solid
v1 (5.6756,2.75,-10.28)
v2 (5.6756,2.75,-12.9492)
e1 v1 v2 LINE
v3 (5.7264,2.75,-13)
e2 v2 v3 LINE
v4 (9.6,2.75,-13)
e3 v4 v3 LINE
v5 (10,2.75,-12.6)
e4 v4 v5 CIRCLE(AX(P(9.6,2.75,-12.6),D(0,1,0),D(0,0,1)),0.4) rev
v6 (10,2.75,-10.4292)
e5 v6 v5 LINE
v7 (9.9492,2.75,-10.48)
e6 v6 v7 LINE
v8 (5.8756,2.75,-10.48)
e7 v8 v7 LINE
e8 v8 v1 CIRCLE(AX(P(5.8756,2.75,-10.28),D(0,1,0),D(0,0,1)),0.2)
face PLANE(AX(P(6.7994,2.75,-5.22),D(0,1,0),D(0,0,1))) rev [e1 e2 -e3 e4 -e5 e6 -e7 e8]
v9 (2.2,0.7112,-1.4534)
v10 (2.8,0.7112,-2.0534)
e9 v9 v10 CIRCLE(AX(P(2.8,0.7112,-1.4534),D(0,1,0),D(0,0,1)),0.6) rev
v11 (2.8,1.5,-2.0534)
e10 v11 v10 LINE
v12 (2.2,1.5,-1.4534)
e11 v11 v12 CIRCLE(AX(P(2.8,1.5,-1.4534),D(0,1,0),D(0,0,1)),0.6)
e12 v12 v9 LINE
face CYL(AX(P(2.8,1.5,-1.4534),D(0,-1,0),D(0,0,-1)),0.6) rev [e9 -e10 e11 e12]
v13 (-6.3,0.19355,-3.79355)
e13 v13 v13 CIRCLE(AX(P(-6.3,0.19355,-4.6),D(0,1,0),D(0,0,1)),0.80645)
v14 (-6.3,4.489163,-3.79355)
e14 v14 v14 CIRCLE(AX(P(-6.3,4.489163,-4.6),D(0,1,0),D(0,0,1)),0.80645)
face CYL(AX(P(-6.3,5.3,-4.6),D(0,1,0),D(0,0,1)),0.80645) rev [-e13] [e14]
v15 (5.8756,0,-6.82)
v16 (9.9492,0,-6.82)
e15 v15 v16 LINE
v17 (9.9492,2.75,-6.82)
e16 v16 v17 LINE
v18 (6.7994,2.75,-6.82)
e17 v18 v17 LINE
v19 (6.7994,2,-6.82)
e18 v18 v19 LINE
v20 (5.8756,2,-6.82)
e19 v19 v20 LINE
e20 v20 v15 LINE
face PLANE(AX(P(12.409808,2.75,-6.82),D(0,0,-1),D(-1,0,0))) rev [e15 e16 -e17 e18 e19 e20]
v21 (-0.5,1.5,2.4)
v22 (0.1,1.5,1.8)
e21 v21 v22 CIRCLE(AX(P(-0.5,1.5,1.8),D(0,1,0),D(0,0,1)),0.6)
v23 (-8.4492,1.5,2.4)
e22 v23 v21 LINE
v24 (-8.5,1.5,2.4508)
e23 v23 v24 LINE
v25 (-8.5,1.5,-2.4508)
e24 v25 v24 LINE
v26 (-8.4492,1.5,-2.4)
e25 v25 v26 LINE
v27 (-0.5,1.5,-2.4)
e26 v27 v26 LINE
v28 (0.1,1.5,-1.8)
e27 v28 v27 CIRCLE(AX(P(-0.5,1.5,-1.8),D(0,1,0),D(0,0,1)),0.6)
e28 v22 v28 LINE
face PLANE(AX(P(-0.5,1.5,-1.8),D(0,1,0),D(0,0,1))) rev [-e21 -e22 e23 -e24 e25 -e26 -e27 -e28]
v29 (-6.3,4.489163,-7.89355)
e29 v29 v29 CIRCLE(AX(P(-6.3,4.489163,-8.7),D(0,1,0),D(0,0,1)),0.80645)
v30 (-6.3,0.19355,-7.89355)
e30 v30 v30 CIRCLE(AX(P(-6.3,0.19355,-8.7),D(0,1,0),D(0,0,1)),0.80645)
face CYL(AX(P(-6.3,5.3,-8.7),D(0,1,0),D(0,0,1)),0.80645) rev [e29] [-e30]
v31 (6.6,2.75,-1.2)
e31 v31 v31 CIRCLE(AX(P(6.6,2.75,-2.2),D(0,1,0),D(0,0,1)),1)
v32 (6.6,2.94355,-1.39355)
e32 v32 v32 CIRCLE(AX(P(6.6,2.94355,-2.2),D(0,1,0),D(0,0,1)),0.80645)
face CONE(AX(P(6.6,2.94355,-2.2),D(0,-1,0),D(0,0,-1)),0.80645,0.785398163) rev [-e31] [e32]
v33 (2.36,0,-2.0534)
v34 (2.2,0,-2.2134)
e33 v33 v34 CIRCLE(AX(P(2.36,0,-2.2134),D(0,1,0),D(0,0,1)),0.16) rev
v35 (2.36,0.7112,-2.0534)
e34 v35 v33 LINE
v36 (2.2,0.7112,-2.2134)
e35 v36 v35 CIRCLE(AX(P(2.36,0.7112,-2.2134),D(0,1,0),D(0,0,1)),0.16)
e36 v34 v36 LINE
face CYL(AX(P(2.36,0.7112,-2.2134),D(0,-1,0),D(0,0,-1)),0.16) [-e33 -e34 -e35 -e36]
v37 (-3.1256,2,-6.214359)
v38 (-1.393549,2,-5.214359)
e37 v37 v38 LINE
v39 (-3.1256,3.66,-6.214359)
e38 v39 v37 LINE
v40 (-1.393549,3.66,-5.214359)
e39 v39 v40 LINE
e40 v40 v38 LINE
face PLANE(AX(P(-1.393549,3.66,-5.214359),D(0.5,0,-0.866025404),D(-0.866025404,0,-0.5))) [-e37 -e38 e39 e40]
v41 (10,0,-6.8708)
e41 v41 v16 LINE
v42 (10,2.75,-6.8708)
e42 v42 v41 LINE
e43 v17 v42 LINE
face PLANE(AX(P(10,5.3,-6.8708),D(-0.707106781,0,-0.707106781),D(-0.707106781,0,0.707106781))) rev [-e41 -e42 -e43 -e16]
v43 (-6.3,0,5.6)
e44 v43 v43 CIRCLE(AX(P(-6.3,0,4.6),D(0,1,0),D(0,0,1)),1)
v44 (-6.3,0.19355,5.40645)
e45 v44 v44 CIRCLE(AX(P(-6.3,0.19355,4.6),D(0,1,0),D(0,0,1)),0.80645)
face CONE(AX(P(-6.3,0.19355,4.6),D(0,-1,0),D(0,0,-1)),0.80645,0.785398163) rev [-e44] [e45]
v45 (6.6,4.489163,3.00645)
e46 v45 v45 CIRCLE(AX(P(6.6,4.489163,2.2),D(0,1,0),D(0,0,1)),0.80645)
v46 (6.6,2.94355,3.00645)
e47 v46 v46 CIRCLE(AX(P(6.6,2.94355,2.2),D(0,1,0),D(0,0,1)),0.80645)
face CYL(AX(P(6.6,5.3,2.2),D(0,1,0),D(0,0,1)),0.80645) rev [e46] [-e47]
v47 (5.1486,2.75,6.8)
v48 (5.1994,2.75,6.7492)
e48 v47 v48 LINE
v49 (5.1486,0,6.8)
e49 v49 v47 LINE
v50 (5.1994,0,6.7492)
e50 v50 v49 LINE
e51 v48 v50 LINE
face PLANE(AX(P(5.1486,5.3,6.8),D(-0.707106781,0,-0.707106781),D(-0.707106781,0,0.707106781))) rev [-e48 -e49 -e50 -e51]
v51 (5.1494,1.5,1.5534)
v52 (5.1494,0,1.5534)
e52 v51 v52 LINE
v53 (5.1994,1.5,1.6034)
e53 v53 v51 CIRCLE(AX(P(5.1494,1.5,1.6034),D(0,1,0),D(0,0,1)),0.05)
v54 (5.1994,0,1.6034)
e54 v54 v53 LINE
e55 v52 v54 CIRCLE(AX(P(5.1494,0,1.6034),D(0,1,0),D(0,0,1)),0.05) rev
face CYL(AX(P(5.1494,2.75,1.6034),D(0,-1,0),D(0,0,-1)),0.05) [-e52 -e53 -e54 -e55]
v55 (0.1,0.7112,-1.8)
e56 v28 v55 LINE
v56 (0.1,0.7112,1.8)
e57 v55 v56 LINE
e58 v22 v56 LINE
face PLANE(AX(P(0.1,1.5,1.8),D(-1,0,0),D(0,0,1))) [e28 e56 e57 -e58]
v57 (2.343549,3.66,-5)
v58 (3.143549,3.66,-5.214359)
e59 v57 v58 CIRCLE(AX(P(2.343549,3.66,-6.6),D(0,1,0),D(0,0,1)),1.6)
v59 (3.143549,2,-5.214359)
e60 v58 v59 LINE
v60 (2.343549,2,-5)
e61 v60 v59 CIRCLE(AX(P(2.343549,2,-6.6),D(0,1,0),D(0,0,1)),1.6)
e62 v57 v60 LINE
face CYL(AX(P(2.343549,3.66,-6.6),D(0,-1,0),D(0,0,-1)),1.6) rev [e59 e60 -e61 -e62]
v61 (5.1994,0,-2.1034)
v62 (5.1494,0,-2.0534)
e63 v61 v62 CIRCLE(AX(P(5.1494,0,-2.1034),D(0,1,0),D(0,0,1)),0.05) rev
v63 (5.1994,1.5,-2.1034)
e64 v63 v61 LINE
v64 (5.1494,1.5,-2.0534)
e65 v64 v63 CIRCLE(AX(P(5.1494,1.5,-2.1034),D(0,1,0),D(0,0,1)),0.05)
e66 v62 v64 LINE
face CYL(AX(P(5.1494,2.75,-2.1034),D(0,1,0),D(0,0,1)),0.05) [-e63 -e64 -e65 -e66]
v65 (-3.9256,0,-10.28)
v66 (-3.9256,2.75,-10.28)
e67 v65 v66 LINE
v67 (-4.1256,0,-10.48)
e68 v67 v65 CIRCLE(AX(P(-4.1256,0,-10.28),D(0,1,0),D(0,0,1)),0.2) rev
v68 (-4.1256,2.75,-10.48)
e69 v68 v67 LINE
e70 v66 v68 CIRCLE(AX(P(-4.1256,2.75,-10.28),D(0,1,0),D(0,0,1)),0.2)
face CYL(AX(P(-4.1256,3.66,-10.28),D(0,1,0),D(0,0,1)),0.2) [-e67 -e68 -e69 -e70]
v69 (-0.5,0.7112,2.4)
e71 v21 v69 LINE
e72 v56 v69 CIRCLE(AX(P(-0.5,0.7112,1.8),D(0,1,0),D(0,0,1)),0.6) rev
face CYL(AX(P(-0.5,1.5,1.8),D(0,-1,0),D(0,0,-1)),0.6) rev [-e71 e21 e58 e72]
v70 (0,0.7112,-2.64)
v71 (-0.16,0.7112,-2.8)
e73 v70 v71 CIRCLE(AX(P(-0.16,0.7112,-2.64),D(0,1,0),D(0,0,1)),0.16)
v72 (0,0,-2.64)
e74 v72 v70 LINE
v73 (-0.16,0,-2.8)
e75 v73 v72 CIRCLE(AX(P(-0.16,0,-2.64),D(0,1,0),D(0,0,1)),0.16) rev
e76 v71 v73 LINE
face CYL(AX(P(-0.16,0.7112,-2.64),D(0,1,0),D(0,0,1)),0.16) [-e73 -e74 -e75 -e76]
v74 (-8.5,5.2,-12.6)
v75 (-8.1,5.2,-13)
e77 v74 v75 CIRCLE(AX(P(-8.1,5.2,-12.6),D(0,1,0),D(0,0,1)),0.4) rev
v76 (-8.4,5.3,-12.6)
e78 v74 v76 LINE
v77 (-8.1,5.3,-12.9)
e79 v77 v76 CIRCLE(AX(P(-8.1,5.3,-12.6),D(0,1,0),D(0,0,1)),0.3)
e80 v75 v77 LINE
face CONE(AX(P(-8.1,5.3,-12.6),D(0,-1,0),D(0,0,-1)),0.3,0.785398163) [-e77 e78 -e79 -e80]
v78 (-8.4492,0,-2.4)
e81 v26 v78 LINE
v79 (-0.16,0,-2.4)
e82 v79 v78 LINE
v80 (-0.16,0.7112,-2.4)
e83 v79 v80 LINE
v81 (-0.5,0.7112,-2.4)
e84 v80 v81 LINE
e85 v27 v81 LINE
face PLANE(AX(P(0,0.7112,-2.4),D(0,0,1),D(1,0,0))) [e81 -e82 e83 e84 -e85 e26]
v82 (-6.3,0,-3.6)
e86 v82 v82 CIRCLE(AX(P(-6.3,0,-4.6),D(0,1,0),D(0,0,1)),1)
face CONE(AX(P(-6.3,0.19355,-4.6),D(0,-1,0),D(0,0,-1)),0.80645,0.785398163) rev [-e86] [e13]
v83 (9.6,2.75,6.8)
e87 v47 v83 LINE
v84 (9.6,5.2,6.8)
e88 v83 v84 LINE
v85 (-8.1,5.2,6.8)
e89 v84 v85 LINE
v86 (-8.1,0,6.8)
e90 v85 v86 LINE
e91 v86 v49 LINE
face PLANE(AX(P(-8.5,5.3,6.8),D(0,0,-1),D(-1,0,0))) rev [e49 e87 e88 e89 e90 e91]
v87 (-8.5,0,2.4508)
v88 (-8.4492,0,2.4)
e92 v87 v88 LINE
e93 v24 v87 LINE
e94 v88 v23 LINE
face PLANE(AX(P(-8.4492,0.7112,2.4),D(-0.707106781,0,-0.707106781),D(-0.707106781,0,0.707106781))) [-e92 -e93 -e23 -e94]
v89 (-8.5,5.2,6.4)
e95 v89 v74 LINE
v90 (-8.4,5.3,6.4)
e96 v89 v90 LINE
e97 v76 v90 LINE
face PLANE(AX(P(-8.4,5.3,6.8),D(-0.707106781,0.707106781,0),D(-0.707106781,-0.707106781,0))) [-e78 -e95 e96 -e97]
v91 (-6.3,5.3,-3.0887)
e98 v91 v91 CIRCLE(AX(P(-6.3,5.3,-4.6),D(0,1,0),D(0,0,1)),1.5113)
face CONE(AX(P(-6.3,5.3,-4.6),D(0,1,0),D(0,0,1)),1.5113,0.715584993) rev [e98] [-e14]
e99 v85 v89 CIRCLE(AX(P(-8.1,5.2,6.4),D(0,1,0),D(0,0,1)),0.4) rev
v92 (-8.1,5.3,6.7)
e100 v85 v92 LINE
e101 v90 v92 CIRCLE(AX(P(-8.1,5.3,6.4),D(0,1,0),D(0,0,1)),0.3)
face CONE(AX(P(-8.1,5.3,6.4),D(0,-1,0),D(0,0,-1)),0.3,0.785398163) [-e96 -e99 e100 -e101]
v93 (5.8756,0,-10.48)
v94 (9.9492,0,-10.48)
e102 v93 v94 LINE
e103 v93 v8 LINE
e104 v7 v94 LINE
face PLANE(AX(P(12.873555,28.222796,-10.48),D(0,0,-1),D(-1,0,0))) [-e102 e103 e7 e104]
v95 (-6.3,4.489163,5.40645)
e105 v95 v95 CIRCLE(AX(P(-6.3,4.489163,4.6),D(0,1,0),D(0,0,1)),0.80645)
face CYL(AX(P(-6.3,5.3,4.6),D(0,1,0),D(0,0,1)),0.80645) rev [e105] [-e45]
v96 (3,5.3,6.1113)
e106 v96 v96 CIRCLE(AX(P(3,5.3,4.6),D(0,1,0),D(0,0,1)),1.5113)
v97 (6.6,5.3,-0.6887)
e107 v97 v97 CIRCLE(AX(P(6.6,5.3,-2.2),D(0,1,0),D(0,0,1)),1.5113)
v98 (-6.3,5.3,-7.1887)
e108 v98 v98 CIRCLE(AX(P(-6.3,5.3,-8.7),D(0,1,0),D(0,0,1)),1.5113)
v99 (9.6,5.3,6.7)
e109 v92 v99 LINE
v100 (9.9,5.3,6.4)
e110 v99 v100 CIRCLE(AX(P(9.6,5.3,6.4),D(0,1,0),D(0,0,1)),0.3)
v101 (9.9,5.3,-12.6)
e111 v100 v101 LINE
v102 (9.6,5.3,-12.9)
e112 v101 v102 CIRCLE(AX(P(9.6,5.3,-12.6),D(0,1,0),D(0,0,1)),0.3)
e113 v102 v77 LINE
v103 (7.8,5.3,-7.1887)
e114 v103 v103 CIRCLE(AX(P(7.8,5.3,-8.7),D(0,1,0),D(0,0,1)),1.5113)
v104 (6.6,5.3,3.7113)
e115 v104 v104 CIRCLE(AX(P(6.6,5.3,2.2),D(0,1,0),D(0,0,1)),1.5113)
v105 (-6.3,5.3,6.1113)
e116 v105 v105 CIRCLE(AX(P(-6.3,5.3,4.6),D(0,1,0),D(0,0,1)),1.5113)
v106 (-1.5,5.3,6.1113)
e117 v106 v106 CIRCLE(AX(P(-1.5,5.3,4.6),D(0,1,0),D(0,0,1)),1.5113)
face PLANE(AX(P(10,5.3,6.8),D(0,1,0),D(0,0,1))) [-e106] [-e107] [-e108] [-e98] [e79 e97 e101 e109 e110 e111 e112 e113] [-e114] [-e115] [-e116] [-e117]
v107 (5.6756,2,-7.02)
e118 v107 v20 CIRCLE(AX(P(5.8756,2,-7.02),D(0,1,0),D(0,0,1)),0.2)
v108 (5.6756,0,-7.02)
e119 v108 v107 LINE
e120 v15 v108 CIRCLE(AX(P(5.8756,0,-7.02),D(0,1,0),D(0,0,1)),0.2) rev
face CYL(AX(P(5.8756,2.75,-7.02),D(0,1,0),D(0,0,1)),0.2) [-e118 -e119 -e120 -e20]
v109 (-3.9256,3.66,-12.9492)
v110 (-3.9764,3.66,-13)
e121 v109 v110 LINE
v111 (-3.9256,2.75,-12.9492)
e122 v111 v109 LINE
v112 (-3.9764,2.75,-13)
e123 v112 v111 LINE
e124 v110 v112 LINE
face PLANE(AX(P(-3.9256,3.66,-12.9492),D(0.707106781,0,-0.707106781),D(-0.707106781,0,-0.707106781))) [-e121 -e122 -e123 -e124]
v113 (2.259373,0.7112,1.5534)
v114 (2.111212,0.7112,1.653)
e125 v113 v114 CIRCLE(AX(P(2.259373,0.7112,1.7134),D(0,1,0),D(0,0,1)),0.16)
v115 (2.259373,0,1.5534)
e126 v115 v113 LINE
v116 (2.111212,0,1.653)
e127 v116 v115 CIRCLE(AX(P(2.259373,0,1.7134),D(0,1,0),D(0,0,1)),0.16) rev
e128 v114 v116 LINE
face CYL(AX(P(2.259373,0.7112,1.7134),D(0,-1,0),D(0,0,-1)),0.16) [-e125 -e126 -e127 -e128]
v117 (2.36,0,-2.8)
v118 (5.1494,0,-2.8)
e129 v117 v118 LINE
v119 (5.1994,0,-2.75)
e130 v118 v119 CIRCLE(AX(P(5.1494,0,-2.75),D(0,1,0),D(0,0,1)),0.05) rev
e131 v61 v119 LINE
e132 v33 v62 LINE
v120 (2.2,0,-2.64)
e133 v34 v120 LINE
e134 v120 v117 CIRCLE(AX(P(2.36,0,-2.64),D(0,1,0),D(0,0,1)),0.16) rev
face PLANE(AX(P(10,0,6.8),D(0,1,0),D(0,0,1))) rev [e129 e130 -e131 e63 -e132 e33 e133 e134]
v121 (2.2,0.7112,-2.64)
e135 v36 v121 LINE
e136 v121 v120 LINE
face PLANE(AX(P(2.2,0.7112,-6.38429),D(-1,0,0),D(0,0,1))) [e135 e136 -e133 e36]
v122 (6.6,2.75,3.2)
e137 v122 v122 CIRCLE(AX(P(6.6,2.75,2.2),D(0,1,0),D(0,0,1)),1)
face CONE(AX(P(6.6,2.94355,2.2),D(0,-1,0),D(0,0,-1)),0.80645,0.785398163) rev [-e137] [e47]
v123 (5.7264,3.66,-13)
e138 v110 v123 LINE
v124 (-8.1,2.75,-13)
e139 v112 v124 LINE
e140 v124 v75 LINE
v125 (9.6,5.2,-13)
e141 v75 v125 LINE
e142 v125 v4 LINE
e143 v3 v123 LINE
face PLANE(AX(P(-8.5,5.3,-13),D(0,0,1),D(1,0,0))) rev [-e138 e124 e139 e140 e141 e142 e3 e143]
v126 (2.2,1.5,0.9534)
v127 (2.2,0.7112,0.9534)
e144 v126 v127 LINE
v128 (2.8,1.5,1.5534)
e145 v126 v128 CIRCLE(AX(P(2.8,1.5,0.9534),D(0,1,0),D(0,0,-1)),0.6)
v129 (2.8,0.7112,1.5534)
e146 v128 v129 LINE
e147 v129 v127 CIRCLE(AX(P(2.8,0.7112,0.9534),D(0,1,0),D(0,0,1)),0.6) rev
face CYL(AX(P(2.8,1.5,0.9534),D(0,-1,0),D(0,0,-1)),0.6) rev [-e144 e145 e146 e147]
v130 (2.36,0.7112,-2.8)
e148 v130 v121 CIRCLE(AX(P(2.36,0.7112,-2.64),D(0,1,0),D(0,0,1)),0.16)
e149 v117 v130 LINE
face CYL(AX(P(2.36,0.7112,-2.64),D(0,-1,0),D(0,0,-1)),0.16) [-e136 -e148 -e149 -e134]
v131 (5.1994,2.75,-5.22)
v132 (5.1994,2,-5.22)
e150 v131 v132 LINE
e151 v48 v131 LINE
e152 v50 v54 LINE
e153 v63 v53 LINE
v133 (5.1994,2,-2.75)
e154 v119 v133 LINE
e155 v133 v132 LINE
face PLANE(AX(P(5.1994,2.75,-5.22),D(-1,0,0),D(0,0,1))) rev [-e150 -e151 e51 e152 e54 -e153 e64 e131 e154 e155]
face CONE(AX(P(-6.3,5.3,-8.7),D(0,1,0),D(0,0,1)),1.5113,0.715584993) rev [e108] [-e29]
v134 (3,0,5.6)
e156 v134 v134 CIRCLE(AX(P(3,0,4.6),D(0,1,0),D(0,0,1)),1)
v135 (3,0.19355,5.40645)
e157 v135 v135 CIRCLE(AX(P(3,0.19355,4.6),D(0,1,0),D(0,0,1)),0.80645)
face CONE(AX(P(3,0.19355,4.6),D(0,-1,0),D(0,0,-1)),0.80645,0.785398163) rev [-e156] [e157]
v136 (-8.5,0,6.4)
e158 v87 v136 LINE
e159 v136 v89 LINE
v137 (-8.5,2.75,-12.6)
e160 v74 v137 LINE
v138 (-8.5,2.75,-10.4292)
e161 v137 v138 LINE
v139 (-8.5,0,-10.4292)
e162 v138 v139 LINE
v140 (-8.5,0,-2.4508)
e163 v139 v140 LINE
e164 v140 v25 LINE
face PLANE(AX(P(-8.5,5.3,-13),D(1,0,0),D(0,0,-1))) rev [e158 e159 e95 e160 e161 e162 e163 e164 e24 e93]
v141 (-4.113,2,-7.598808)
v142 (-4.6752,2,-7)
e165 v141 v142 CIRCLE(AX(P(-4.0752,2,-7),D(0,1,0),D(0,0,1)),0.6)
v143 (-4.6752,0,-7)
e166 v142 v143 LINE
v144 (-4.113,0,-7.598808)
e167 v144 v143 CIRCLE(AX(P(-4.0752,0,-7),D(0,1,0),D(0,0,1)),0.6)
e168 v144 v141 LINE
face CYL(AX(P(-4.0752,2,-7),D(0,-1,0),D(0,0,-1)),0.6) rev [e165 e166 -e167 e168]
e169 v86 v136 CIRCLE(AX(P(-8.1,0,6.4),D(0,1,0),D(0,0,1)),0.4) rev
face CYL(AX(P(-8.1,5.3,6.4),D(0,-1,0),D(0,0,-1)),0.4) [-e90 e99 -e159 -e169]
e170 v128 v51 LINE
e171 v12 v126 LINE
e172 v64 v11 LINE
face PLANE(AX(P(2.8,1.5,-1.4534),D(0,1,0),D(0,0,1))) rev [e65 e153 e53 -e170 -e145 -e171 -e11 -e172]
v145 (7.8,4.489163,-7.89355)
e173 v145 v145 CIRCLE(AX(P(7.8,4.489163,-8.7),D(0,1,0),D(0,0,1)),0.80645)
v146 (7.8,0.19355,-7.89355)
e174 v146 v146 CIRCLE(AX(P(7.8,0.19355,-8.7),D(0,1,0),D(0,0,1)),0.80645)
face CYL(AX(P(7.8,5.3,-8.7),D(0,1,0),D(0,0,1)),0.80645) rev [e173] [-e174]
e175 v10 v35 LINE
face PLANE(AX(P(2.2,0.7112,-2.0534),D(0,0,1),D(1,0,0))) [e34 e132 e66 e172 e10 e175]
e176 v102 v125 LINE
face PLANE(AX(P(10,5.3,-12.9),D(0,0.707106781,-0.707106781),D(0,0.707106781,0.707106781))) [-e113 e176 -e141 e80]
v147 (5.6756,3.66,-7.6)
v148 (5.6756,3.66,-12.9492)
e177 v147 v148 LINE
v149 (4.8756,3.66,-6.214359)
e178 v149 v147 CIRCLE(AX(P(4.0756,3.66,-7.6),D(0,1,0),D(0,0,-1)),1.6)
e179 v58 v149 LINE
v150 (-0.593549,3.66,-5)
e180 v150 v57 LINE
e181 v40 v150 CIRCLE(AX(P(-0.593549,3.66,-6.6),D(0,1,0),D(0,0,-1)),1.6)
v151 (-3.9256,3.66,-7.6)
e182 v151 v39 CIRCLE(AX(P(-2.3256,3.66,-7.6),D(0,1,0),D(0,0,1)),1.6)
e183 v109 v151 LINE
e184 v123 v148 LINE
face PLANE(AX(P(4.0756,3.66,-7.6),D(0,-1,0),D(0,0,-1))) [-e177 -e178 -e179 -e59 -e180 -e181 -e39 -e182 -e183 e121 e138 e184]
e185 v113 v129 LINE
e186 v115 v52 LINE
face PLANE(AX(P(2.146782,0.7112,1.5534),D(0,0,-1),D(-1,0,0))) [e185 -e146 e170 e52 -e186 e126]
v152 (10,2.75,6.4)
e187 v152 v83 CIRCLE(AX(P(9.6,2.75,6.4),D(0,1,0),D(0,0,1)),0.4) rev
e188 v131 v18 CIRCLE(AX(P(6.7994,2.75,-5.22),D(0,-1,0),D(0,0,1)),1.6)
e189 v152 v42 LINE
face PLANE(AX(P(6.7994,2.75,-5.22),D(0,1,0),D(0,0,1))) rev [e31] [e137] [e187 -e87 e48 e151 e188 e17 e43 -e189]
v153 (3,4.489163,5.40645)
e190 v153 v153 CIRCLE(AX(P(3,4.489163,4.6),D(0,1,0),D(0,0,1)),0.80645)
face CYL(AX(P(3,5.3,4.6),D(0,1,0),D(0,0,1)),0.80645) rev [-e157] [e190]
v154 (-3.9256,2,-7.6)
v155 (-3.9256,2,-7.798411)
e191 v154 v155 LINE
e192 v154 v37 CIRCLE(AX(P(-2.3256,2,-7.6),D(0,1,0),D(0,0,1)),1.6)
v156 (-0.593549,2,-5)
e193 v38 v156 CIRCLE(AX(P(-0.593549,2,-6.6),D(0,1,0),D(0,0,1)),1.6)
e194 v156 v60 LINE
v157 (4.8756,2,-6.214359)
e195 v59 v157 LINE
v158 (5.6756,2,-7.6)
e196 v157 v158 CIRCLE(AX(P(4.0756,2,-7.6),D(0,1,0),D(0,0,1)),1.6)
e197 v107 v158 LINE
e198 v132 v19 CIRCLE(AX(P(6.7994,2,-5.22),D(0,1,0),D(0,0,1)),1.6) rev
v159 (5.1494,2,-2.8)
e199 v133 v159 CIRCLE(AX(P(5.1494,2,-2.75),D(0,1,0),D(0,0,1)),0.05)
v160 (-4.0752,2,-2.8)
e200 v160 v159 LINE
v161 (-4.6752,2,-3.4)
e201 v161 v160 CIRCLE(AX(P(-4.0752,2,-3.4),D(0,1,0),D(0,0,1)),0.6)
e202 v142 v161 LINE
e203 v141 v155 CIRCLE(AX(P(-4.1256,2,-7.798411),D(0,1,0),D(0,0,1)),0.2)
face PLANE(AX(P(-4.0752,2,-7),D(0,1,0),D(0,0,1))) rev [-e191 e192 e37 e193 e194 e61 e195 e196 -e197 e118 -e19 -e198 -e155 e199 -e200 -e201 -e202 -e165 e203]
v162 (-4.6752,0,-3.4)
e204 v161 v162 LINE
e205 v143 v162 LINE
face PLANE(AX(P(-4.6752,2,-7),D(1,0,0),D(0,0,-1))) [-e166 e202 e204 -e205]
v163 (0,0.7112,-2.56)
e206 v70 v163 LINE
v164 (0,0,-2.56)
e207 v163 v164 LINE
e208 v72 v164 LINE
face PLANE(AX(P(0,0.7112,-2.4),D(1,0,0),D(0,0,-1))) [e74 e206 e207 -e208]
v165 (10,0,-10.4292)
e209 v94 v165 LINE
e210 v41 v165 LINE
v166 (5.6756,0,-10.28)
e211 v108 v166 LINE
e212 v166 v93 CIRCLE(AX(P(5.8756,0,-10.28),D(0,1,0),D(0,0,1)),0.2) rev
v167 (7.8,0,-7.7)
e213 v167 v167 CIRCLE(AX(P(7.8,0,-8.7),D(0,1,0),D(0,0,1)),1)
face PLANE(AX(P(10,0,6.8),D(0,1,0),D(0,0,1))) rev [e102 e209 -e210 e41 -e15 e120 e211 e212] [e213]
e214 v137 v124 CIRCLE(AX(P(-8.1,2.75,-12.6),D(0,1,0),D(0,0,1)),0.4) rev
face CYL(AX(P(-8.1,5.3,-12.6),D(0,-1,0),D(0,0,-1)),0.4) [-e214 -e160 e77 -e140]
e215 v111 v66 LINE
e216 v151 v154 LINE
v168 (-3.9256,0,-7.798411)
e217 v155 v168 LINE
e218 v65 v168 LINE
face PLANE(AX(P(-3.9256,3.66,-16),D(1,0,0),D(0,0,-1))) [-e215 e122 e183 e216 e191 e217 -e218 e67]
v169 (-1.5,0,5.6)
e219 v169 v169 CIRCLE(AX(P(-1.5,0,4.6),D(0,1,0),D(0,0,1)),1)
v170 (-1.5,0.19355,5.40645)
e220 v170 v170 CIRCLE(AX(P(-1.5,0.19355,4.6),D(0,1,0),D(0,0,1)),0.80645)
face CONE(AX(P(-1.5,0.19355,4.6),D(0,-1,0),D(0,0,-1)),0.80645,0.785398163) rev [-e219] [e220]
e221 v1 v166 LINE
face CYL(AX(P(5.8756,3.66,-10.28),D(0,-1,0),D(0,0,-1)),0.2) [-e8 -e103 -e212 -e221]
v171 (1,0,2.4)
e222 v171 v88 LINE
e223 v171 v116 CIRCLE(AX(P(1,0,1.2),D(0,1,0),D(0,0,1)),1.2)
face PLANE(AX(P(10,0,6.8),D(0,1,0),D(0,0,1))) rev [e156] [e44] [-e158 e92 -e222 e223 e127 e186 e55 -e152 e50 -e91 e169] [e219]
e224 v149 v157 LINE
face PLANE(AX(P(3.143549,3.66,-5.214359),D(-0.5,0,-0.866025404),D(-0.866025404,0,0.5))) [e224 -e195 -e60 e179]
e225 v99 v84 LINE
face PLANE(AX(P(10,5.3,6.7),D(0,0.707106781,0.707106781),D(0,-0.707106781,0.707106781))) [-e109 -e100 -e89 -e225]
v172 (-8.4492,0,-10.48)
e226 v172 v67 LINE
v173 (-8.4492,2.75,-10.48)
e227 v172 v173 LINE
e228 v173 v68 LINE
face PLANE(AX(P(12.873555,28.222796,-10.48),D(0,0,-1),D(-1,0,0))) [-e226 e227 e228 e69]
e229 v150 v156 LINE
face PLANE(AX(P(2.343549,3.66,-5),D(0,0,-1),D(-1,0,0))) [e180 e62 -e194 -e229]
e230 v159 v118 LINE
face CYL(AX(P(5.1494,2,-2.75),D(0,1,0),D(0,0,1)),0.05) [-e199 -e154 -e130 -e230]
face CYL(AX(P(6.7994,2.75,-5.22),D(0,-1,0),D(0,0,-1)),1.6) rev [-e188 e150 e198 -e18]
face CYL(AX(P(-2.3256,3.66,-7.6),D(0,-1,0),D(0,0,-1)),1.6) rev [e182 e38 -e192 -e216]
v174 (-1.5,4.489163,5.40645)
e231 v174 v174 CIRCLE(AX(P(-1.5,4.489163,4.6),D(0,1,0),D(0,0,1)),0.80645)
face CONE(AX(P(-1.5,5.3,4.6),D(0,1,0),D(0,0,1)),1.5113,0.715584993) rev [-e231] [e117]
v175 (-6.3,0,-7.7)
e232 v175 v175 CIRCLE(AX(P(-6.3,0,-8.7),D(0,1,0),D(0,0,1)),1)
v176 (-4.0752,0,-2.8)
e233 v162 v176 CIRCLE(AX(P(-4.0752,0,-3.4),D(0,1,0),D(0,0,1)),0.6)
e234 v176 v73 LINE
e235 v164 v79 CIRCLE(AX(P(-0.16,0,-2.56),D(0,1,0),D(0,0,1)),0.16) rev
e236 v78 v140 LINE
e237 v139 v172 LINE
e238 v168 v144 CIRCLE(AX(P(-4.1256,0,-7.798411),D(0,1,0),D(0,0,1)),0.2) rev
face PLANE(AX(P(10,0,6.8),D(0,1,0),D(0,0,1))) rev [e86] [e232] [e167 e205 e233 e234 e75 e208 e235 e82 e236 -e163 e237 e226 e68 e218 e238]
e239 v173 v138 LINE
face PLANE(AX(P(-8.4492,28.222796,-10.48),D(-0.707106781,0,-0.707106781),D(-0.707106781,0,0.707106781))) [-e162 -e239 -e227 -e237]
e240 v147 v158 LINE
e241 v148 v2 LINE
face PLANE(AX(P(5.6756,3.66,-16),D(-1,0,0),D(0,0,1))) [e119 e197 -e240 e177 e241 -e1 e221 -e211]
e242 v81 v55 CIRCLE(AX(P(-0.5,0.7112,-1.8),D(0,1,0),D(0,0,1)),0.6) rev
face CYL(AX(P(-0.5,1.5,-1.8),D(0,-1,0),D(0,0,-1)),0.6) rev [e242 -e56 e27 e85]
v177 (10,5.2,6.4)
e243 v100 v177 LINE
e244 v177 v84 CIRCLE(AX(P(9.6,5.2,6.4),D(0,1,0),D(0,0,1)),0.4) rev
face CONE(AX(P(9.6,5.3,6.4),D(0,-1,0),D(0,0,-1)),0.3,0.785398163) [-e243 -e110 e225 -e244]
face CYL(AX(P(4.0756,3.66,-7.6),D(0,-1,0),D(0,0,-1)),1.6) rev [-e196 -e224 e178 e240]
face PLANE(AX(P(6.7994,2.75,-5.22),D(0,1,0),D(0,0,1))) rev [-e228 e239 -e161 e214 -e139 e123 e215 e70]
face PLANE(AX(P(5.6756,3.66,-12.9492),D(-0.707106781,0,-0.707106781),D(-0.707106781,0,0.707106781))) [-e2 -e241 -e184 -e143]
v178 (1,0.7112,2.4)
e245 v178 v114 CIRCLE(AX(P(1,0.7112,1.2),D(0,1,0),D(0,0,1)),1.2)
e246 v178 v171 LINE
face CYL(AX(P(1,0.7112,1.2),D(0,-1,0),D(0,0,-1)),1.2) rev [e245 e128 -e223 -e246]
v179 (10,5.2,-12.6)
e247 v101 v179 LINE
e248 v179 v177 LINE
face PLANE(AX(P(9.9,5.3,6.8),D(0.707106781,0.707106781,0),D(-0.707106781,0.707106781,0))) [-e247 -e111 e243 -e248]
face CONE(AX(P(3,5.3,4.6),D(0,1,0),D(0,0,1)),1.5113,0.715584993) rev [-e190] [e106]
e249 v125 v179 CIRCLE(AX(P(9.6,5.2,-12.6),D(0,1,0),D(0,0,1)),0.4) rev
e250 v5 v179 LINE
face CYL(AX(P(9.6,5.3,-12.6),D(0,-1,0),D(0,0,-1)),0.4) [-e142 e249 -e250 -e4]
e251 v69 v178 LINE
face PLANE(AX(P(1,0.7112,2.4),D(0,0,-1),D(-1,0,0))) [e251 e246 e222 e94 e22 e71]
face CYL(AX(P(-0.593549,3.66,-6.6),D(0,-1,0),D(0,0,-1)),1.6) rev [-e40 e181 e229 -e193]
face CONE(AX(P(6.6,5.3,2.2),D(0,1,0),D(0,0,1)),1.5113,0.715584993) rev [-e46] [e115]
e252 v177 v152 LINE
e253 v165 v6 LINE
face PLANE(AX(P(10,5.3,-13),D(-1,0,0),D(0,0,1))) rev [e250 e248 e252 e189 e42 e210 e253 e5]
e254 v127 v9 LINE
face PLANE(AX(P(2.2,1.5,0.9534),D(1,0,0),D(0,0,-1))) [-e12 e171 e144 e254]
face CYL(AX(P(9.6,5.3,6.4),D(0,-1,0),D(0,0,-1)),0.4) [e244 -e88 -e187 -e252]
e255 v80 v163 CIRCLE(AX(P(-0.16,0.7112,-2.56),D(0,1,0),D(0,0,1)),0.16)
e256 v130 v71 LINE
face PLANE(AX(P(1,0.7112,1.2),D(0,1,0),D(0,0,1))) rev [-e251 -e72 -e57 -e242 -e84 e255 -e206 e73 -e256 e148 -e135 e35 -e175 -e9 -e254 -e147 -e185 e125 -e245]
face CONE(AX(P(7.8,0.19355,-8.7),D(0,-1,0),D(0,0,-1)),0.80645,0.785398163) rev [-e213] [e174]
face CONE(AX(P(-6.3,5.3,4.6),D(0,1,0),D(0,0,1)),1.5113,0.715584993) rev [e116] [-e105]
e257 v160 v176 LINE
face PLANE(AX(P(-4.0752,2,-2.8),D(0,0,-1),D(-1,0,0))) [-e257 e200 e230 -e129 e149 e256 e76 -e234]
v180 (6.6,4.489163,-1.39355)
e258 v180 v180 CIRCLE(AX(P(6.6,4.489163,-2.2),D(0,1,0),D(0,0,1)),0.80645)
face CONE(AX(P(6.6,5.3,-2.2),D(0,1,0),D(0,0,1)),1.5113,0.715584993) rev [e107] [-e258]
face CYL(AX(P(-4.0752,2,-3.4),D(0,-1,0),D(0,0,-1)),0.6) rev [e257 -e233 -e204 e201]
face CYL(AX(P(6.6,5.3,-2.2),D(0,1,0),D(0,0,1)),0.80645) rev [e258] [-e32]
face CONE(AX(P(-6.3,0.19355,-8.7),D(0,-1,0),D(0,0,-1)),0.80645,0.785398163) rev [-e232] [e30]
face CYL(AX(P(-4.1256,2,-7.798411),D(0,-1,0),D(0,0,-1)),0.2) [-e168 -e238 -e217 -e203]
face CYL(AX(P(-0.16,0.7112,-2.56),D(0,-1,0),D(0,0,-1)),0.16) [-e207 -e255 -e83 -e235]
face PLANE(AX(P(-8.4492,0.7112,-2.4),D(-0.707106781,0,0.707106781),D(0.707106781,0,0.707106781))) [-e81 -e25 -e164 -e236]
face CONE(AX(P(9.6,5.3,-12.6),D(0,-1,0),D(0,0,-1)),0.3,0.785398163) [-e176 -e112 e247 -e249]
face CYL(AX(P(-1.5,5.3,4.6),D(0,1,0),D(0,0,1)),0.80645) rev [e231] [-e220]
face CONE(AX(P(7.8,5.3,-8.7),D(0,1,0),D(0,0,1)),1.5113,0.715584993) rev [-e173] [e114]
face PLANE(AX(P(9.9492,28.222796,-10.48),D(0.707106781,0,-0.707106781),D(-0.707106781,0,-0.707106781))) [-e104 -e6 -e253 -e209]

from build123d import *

# Parameters (mm, degrees)
SKETCH1_W                           = 18.5
SKETCH1_H                           = 19.8
BE_00_BODY_DEPTH                    = 5.3
CE_00_MAIN_CAVITY_DEPTH             = 0.7112
CUT_EXTRUDE26_DEPTH                 = 1.5
CE_00_OUTPUT_CAVITY_DEPTH           = 2.75
CE_00_MULTIPIN_CAVITY_DEPTH         = 3.66
SKETCH43_W                          = 24.756879044
SKETCH43_H                          = 5.996687822
CE_00_NEAR_MULTIPIN_CONNECTOR_DEPTH = 2.75
CE_00_DC_BOARD_CAVITY_DEPTH         = 2
FILLET_A_0_4MM_R                    = 0.4
FILLET_B_0_2_R                      = 0.2
FILLET_C_0_16MM_R                   = 0.16
FILLET_E_0_05MM_R                   = 0.05
CHAMFER_A_0_10MM_SIZE               = 0.1
CHAMFER1_SIZE                       = 0.0508


# Read off the part's stored shape, not the designer's step: CSK for #0 Flat Head Machine Screw2
with BuildPart() as part:
    # Sketch1 → BE-00 Body (new body)
    with BuildSketch(Plane(origin=(0, 0, 0), x_dir=(1, 0, 0), z_dir=(0, 1, 0))):
        with Locations((0.75, 3.1)):
            Rectangle(SKETCH1_W, SKETCH1_H)
    extrude(amount=BE_00_BODY_DEPTH)

    # Sketch9 → CE-00 Main Cavity (cut)
    with BuildSketch(Plane(origin=(0, 0, 0), x_dir=(1, 0, 0), z_dir=(0, 1, 0))):
        with BuildLine():
            Line((2.146781775, -1.5534), (12.535922666, -1.5534))
            Line((12.535922666, -1.5534), (12.535922666, 2.0534))
            Line((12.535922666, 2.0534), (2.2, 2.0534))
            Line((2.2, 2.0534), (2.2, 6.384290248))
            Line((2.2, 6.384290248), (0, 6.384290248))
            Line((0, 6.384290248), (0, 2.4))
            Line((0, 2.4), (-10.40064316, 2.4))
            Line((-10.40064316, 2.4), (-10.40064316, -2.4))
            Line((-10.40064316, -2.4), (1, -2.4))
            ThreePointArc((1, -2.4), (1.712713126, -2.165422187), (2.146781775, -1.5534))
        make_face()
    extrude(amount=CE_00_MAIN_CAVITY_DEPTH, mode=Mode.SUBTRACT)

    # Sketch45 → Cut-Extrude26 (cut)
    with BuildSketch(Plane(origin=(0, 0, 0), x_dir=(1, 0, 0), z_dir=(0, 1, 0))):
        with BuildLine():
            Line((-0.5, -2.4), (-10.40064316, -2.4))
            Line((-10.40064316, -2.4), (-10.40064316, 2.4))
            Line((-10.40064316, 2.4), (-0.5, 2.4))
            ThreePointArc((-0.5, 2.4), (-0.075735931, 2.224264069), (0.1, 1.8))
            Line((0.1, 1.8), (0.1, -1.8))
            ThreePointArc((0.1, -1.8), (-0.075735931, -2.224264069), (-0.5, -2.4))
        make_face()
        with BuildLine():
            Line((12.535922666, -1.5534), (2.8, -1.5534))
            ThreePointArc((2.8, -1.5534), (2.375735931, -1.377664069), (2.2, -0.9534))
            Line((2.2, -0.9534), (2.2, 1.4534))
            ThreePointArc((2.2, 1.4534), (2.375735931, 1.877664069), (2.8, 2.0534))
            Line((2.8, 2.0534), (12.535922666, 2.0534))
            Line((12.535922666, 2.0534), (12.535922666, -1.5534))
        make_face()
    extrude(amount=CUT_EXTRUDE26_DEPTH, mode=Mode.SUBTRACT)

    # Sketch29 → CE-00 Output Cavity (cut)
    with BuildSketch(Plane.XZ):
        with BuildLine():
            Line((5.1994, -5.22), (5.1994, 10.160265554))
            Line((5.1994, 10.160265554), (12.409807772, 10.160265554))
            Line((12.409807772, 10.160265554), (12.409807772, -6.82))
            Line((12.409807772, -6.82), (6.7994, -6.82))
            ThreePointArc((6.7994, -6.82), (5.66802915, -6.35137085), (5.1994, -5.22))
        make_face()
    extrude(amount=-CE_00_OUTPUT_CAVITY_DEPTH, mode=Mode.SUBTRACT)

    # Sketch4 → CE-00 Multipin Cavity (cut)
    with BuildSketch(Plane(origin=(0, 0, 0), x_dir=(1, 0, 0), z_dir=(0, 1, 0))):
        with BuildLine():
            Line((-1.393549192, 5.214359354), (-3.1256, 6.214359354))
            ThreePointArc((-3.1256, 6.214359354), (-3.711240646, 6.8), (-3.9256, 7.6))
            Line((-3.9256, 7.6), (-3.9256, 16))
            Line((-3.9256, 16), (5.6756, 16))
            Line((5.6756, 16), (5.6756, 7.6))
            ThreePointArc((5.6756, 7.6), (5.461240646, 6.8), (4.8756, 6.214359354))
            Line((4.8756, 6.214359354), (3.143549192, 5.214359354))
            ThreePointArc((3.143549192, 5.214359354), (2.757659665, 5.054518678), (2.343549192, 5))
            Line((2.343549192, 5), (-0.593549192, 5))
            ThreePointArc((-0.593549192, 5), (-1.007659665, 5.054518678), (-1.393549192, 5.214359354))
        make_face()
    extrude(amount=CE_00_MULTIPIN_CAVITY_DEPTH, mode=Mode.SUBTRACT)

    # Sketch43 → CE-00 Near Multipin Connector (cut)
    with BuildSketch(Plane(origin=(0, 0, 0), x_dir=(1, 0, 0), z_dir=(0, 1, 0))):
        with Locations((0.495115422, 13.478343911)):
            Rectangle(SKETCH43_W, SKETCH43_H)
    extrude(amount=CE_00_NEAR_MULTIPIN_CONNECTOR_DEPTH, mode=Mode.SUBTRACT)

    # Sketch10 → CE-00 DC board Cavity (cut)
    with BuildSketch(Plane(origin=(0, 0, 0), x_dir=(1, 0, 0), z_dir=(0, 1, 0))):
        with BuildLine():
            Line((5.6756, 6.82), (5.6756, 7.6))
            Line((5.6756, 7.6), (-4.0752, 7.6))
            ThreePointArc((-4.0752, 7.6), (-4.499464069, 7.424264069), (-4.6752, 7))
            Line((-4.6752, 7), (-4.6752, 3.4))
            ThreePointArc((-4.6752, 3.4), (-4.499464069, 2.975735931), (-4.0752, 2.8))
            Line((-4.0752, 2.8), (8.306329243, 2.8))
            Line((8.306329243, 2.8), (8.306329243, 6.82))
            Line((8.306329243, 6.82), (5.6756, 6.82))
        make_face()
    extrude(amount=CE_00_DC_BOARD_CAVITY_DEPTH, mode=Mode.SUBTRACT)

    # CSK for #0 Flat Head Machine Screw2 outl → CSK for #0 Flat Head Machine Screw2 (revolve, cut)
    with BuildSketch(Plane(origin=(3, 0, 4.6), x_dir=(1, 0, 0), z_dir=(0, 0, 1))):
        Polygon((0, 0), (1.000000032, 0), (0.80645, 0.193550032), (0.80645, 4.489162828), (1.5113, 5.3), (0, 5.3), align=None)
    revolve(axis=Axis((3, 0, 4.6), (0, 1, 0)), mode=Mode.SUBTRACT)

    # CSK for _0 Flat Head Machine Screw2 2 ou → CSK for _0 Flat Head Machine Screw2 2 (revolve, cut)
    with BuildSketch(Plane(origin=(-1.5, 0, 4.6), x_dir=(1, 0, 0), z_dir=(0, 0, 1))):
        Polygon((0, 0), (1.000000032, 0), (0.80645, 0.193550032), (0.80645, 4.489162828), (1.5113, 5.3), (0, 5.3), align=None)
    revolve(axis=Axis((-1.5, 0, 4.6), (0, 1, 0)), mode=Mode.SUBTRACT)

    # CSK for _0 Flat Head Machine Screw2 3 ou → CSK for _0 Flat Head Machine Screw2 3 (revolve, cut)
    with BuildSketch(Plane(origin=(-6.3, 0, 4.6), x_dir=(1, 0, 0), z_dir=(0, 0, 1))):
        Polygon((0, 0), (1.000000032, 0), (0.80645, 0.193550032), (0.80645, 4.489162828), (1.5113, 5.3), (0, 5.3), align=None)
    revolve(axis=Axis((-6.3, 0, 4.6), (0, 1, 0)), mode=Mode.SUBTRACT)

    # CSK for _0 Flat Head Machine Screw2 4 ou → CSK for _0 Flat Head Machine Screw2 4 (revolve, cut)
    with BuildSketch(Plane(origin=(6.6, 0, 2.2), x_dir=(1, 0, 0), z_dir=(0, 0, 1))):
        Polygon((0, 2.75), (1.000000032, 2.75), (0.80645, 2.943550032), (0.80645, 4.489162828), (1.5113, 5.3), (0, 5.3), align=None)
    revolve(axis=Axis((6.6, 0, 2.2), (0, 1, 0)), mode=Mode.SUBTRACT)

    # CSK for _0 Flat Head Machine Screw2 5 ou → CSK for _0 Flat Head Machine Screw2 5 (revolve, cut)
    with BuildSketch(Plane(origin=(6.6, 0, -2.2), x_dir=(1, 0, 0), z_dir=(0, 0, 1))):
        Polygon((0, 2.75), (1.000000032, 2.75), (0.80645, 2.943550032), (0.80645, 4.489162828), (1.5113, 5.3), (0, 5.3), align=None)
    revolve(axis=Axis((6.6, 0, -2.2), (0, 1, 0)), mode=Mode.SUBTRACT)

    # CSK for _0 Flat Head Machine Screw2 6 ou → CSK for _0 Flat Head Machine Screw2 6 (revolve, cut)
    with BuildSketch(Plane(origin=(-6.3, 0, -4.6), x_dir=(1, 0, 0), z_dir=(0, 0, 1))):
        Polygon((0, 0), (1.000000032, 0), (0.80645, 0.193550032), (0.80645, 4.489162828), (1.5113, 5.3), (0, 5.3), align=None)
    revolve(axis=Axis((-6.3, 0, -4.6), (0, 1, 0)), mode=Mode.SUBTRACT)

    # CSK for _0 Flat Head Machine Screw2 7 ou → CSK for _0 Flat Head Machine Screw2 7 (revolve, cut)
    with BuildSketch(Plane(origin=(-6.3, 0, -8.7), x_dir=(1, 0, 0), z_dir=(0, 0, 1))):
        Polygon((0, 0), (1.000000032, 0), (0.80645, 0.193550032), (0.80645, 4.489162828), (1.5113, 5.3), (0, 5.3), align=None)
    revolve(axis=Axis((-6.3, 0, -8.7), (0, 1, 0)), mode=Mode.SUBTRACT)

    # CSK for _0 Flat Head Machine Screw2 8 ou → CSK for _0 Flat Head Machine Screw2 8 (revolve, cut)
    with BuildSketch(Plane(origin=(7.8, 0, -8.7), x_dir=(1, 0, 0), z_dir=(0, 0, 1))):
        Polygon((0, 0), (1.000000032, 0), (0.80645, 0.193550032), (0.80645, 4.489162828), (1.5113, 5.3), (0, 5.3), align=None)
    revolve(axis=Axis((7.8, 0, -8.7), (0, 1, 0)), mode=Mode.SUBTRACT)

    # Fillet A 0.4mm
    fillet_a_0_4mm_edges = [part.edges().sort_by_distance(p)[0] for p in [
        (10, 4.025, 6.8),
        (-8.5, 2.65, 6.8),
        (-8.5, 4.025, -13),
        (10, 4.025, -13),
    ]]
    fillet(fillet_a_0_4mm_edges, radius=FILLET_A_0_4MM_R)

    # Fillet B 0.2
    # the kernel refuses this fillet: 0.2 mm, written as the material it takes off along each edge
    with BuildSketch(Plane(origin=(5.6756, -0.5, -6.82), x_dir=(0, 0, -1), z_dir=(0, 1, 0))) as fillet_b_0_2_piece_1:
        with BuildLine():
            CenterArc((FILLET_B_0_2_R, -FILLET_B_0_2_R), FILLET_B_0_2_R, 90, 90)
            Line((0, -FILLET_B_0_2_R), (0, 0))
            Line((0, 0), (FILLET_B_0_2_R, 0))
        make_face()
    extrude(amount=2.5, mode=Mode.SUBTRACT)
    with BuildSketch(Plane(origin=(5.6756, -0.5, -10.48), x_dir=(0, 0, 1), z_dir=(0, 1, 0)), Plane(origin=(-3.9256, 2.75, -10.48), x_dir=(0, 0, 1), z_dir=(0, -1, 0))) as fillet_b_0_2_piece_2:
        with BuildLine():
            CenterArc((FILLET_B_0_2_R, FILLET_B_0_2_R), FILLET_B_0_2_R, 180, 90)
            Line((0, FILLET_B_0_2_R), (0, 0))
            Line((0, 0), (FILLET_B_0_2_R, 0))
        make_face()
    extrude(amount=3.25, mode=Mode.SUBTRACT)
    with BuildSketch(Plane(origin=(-3.9256, -0.496027054, -7.6), x_dir=(0, 0, -1), z_dir=(0, 1, 0))) as fillet_b_0_2_piece_3:
        with BuildLine():
            CenterArc((0.198410822, 0.2), FILLET_B_0_2_R, 183.612026157, 86.387973843)
            Line((-0.001191884, 0.1874), (-0.021152154, 0.18614))
            ThreePointArc((-0.021152154, 0.18614), (-0.02, 0.1496), (-0.02, 0))
            Line((-0.02, 0), (0, -0.02))
            Line((0, -0.02), (0.198410822, -0.02))
            Line((0.198410822, -0.02), (0.198410822, 0))
        make_face()
    extrude(amount=2.496027054, mode=Mode.SUBTRACT)

    # Fillet C 0.16mm
    fillet_c_0_16mm_edges = [part.edges().sort_by_distance(p)[0] for p in [
        (2.2, 0.3556, -2.8),
        (0, 0.3556, -2.8),
        (0, 0.3556, -2.4),
        (2.146781775, 0.3556, 1.5534),
        (2.2, 0.3556, -2.0534),
    ]]
    fillet(fillet_c_0_16mm_edges, radius=FILLET_C_0_16MM_R)

    # Fillet E 0.05mm
    fillet_e_0_05mm_edges = [part.edges().sort_by_distance(p)[0] for p in [
        (5.1994, 0.75, 1.5534),
        (5.1994, 0.75, -2.0534),
        (5.1994, 1, -2.8),
    ]]
    fillet(fillet_e_0_05mm_edges, radius=FILLET_E_0_05MM_R)

    # Chamfer A 0.10mm
    chamfer_a_0_10mm_edges = [part.edges().sort_by_distance(p)[0] for p in [
        (-8.5, 5.3, -3.1),
        (0.75, 5.3, -13),
        (10, 5.3, -3.1),
        (0.75, 5.3, 6.8),
        (-8.382842712, 5.3, 6.682842712),
        (9.882842712, 5.3, 6.682842712),
        (9.882842712, 5.3, -12.882842712),
        (-8.382842712, 5.3, -12.882842712),
    ]]
    chamfer(chamfer_a_0_10mm_edges, length=CHAMFER_A_0_10MM_SIZE)

    # Chamfer1
    chamfer1_edges = [part.edges().sort_by_distance(p)[0] for p in [
        (10, 1.375, -6.82),
        (5.1994, 1.375, 6.8),
        (5.6756, 3.205, -13),
        (-3.9256, 3.205, -13),
        (10, 1.375, -10.48),
        (-8.5, 1.375, -10.48),
        (-8.5, 0.75, -2.4),
        (-8.5, 0.75, 2.4),
    ]]
    chamfer(chamfer1_edges, length=CHAMFER1_SIZE)


solid = part.part
